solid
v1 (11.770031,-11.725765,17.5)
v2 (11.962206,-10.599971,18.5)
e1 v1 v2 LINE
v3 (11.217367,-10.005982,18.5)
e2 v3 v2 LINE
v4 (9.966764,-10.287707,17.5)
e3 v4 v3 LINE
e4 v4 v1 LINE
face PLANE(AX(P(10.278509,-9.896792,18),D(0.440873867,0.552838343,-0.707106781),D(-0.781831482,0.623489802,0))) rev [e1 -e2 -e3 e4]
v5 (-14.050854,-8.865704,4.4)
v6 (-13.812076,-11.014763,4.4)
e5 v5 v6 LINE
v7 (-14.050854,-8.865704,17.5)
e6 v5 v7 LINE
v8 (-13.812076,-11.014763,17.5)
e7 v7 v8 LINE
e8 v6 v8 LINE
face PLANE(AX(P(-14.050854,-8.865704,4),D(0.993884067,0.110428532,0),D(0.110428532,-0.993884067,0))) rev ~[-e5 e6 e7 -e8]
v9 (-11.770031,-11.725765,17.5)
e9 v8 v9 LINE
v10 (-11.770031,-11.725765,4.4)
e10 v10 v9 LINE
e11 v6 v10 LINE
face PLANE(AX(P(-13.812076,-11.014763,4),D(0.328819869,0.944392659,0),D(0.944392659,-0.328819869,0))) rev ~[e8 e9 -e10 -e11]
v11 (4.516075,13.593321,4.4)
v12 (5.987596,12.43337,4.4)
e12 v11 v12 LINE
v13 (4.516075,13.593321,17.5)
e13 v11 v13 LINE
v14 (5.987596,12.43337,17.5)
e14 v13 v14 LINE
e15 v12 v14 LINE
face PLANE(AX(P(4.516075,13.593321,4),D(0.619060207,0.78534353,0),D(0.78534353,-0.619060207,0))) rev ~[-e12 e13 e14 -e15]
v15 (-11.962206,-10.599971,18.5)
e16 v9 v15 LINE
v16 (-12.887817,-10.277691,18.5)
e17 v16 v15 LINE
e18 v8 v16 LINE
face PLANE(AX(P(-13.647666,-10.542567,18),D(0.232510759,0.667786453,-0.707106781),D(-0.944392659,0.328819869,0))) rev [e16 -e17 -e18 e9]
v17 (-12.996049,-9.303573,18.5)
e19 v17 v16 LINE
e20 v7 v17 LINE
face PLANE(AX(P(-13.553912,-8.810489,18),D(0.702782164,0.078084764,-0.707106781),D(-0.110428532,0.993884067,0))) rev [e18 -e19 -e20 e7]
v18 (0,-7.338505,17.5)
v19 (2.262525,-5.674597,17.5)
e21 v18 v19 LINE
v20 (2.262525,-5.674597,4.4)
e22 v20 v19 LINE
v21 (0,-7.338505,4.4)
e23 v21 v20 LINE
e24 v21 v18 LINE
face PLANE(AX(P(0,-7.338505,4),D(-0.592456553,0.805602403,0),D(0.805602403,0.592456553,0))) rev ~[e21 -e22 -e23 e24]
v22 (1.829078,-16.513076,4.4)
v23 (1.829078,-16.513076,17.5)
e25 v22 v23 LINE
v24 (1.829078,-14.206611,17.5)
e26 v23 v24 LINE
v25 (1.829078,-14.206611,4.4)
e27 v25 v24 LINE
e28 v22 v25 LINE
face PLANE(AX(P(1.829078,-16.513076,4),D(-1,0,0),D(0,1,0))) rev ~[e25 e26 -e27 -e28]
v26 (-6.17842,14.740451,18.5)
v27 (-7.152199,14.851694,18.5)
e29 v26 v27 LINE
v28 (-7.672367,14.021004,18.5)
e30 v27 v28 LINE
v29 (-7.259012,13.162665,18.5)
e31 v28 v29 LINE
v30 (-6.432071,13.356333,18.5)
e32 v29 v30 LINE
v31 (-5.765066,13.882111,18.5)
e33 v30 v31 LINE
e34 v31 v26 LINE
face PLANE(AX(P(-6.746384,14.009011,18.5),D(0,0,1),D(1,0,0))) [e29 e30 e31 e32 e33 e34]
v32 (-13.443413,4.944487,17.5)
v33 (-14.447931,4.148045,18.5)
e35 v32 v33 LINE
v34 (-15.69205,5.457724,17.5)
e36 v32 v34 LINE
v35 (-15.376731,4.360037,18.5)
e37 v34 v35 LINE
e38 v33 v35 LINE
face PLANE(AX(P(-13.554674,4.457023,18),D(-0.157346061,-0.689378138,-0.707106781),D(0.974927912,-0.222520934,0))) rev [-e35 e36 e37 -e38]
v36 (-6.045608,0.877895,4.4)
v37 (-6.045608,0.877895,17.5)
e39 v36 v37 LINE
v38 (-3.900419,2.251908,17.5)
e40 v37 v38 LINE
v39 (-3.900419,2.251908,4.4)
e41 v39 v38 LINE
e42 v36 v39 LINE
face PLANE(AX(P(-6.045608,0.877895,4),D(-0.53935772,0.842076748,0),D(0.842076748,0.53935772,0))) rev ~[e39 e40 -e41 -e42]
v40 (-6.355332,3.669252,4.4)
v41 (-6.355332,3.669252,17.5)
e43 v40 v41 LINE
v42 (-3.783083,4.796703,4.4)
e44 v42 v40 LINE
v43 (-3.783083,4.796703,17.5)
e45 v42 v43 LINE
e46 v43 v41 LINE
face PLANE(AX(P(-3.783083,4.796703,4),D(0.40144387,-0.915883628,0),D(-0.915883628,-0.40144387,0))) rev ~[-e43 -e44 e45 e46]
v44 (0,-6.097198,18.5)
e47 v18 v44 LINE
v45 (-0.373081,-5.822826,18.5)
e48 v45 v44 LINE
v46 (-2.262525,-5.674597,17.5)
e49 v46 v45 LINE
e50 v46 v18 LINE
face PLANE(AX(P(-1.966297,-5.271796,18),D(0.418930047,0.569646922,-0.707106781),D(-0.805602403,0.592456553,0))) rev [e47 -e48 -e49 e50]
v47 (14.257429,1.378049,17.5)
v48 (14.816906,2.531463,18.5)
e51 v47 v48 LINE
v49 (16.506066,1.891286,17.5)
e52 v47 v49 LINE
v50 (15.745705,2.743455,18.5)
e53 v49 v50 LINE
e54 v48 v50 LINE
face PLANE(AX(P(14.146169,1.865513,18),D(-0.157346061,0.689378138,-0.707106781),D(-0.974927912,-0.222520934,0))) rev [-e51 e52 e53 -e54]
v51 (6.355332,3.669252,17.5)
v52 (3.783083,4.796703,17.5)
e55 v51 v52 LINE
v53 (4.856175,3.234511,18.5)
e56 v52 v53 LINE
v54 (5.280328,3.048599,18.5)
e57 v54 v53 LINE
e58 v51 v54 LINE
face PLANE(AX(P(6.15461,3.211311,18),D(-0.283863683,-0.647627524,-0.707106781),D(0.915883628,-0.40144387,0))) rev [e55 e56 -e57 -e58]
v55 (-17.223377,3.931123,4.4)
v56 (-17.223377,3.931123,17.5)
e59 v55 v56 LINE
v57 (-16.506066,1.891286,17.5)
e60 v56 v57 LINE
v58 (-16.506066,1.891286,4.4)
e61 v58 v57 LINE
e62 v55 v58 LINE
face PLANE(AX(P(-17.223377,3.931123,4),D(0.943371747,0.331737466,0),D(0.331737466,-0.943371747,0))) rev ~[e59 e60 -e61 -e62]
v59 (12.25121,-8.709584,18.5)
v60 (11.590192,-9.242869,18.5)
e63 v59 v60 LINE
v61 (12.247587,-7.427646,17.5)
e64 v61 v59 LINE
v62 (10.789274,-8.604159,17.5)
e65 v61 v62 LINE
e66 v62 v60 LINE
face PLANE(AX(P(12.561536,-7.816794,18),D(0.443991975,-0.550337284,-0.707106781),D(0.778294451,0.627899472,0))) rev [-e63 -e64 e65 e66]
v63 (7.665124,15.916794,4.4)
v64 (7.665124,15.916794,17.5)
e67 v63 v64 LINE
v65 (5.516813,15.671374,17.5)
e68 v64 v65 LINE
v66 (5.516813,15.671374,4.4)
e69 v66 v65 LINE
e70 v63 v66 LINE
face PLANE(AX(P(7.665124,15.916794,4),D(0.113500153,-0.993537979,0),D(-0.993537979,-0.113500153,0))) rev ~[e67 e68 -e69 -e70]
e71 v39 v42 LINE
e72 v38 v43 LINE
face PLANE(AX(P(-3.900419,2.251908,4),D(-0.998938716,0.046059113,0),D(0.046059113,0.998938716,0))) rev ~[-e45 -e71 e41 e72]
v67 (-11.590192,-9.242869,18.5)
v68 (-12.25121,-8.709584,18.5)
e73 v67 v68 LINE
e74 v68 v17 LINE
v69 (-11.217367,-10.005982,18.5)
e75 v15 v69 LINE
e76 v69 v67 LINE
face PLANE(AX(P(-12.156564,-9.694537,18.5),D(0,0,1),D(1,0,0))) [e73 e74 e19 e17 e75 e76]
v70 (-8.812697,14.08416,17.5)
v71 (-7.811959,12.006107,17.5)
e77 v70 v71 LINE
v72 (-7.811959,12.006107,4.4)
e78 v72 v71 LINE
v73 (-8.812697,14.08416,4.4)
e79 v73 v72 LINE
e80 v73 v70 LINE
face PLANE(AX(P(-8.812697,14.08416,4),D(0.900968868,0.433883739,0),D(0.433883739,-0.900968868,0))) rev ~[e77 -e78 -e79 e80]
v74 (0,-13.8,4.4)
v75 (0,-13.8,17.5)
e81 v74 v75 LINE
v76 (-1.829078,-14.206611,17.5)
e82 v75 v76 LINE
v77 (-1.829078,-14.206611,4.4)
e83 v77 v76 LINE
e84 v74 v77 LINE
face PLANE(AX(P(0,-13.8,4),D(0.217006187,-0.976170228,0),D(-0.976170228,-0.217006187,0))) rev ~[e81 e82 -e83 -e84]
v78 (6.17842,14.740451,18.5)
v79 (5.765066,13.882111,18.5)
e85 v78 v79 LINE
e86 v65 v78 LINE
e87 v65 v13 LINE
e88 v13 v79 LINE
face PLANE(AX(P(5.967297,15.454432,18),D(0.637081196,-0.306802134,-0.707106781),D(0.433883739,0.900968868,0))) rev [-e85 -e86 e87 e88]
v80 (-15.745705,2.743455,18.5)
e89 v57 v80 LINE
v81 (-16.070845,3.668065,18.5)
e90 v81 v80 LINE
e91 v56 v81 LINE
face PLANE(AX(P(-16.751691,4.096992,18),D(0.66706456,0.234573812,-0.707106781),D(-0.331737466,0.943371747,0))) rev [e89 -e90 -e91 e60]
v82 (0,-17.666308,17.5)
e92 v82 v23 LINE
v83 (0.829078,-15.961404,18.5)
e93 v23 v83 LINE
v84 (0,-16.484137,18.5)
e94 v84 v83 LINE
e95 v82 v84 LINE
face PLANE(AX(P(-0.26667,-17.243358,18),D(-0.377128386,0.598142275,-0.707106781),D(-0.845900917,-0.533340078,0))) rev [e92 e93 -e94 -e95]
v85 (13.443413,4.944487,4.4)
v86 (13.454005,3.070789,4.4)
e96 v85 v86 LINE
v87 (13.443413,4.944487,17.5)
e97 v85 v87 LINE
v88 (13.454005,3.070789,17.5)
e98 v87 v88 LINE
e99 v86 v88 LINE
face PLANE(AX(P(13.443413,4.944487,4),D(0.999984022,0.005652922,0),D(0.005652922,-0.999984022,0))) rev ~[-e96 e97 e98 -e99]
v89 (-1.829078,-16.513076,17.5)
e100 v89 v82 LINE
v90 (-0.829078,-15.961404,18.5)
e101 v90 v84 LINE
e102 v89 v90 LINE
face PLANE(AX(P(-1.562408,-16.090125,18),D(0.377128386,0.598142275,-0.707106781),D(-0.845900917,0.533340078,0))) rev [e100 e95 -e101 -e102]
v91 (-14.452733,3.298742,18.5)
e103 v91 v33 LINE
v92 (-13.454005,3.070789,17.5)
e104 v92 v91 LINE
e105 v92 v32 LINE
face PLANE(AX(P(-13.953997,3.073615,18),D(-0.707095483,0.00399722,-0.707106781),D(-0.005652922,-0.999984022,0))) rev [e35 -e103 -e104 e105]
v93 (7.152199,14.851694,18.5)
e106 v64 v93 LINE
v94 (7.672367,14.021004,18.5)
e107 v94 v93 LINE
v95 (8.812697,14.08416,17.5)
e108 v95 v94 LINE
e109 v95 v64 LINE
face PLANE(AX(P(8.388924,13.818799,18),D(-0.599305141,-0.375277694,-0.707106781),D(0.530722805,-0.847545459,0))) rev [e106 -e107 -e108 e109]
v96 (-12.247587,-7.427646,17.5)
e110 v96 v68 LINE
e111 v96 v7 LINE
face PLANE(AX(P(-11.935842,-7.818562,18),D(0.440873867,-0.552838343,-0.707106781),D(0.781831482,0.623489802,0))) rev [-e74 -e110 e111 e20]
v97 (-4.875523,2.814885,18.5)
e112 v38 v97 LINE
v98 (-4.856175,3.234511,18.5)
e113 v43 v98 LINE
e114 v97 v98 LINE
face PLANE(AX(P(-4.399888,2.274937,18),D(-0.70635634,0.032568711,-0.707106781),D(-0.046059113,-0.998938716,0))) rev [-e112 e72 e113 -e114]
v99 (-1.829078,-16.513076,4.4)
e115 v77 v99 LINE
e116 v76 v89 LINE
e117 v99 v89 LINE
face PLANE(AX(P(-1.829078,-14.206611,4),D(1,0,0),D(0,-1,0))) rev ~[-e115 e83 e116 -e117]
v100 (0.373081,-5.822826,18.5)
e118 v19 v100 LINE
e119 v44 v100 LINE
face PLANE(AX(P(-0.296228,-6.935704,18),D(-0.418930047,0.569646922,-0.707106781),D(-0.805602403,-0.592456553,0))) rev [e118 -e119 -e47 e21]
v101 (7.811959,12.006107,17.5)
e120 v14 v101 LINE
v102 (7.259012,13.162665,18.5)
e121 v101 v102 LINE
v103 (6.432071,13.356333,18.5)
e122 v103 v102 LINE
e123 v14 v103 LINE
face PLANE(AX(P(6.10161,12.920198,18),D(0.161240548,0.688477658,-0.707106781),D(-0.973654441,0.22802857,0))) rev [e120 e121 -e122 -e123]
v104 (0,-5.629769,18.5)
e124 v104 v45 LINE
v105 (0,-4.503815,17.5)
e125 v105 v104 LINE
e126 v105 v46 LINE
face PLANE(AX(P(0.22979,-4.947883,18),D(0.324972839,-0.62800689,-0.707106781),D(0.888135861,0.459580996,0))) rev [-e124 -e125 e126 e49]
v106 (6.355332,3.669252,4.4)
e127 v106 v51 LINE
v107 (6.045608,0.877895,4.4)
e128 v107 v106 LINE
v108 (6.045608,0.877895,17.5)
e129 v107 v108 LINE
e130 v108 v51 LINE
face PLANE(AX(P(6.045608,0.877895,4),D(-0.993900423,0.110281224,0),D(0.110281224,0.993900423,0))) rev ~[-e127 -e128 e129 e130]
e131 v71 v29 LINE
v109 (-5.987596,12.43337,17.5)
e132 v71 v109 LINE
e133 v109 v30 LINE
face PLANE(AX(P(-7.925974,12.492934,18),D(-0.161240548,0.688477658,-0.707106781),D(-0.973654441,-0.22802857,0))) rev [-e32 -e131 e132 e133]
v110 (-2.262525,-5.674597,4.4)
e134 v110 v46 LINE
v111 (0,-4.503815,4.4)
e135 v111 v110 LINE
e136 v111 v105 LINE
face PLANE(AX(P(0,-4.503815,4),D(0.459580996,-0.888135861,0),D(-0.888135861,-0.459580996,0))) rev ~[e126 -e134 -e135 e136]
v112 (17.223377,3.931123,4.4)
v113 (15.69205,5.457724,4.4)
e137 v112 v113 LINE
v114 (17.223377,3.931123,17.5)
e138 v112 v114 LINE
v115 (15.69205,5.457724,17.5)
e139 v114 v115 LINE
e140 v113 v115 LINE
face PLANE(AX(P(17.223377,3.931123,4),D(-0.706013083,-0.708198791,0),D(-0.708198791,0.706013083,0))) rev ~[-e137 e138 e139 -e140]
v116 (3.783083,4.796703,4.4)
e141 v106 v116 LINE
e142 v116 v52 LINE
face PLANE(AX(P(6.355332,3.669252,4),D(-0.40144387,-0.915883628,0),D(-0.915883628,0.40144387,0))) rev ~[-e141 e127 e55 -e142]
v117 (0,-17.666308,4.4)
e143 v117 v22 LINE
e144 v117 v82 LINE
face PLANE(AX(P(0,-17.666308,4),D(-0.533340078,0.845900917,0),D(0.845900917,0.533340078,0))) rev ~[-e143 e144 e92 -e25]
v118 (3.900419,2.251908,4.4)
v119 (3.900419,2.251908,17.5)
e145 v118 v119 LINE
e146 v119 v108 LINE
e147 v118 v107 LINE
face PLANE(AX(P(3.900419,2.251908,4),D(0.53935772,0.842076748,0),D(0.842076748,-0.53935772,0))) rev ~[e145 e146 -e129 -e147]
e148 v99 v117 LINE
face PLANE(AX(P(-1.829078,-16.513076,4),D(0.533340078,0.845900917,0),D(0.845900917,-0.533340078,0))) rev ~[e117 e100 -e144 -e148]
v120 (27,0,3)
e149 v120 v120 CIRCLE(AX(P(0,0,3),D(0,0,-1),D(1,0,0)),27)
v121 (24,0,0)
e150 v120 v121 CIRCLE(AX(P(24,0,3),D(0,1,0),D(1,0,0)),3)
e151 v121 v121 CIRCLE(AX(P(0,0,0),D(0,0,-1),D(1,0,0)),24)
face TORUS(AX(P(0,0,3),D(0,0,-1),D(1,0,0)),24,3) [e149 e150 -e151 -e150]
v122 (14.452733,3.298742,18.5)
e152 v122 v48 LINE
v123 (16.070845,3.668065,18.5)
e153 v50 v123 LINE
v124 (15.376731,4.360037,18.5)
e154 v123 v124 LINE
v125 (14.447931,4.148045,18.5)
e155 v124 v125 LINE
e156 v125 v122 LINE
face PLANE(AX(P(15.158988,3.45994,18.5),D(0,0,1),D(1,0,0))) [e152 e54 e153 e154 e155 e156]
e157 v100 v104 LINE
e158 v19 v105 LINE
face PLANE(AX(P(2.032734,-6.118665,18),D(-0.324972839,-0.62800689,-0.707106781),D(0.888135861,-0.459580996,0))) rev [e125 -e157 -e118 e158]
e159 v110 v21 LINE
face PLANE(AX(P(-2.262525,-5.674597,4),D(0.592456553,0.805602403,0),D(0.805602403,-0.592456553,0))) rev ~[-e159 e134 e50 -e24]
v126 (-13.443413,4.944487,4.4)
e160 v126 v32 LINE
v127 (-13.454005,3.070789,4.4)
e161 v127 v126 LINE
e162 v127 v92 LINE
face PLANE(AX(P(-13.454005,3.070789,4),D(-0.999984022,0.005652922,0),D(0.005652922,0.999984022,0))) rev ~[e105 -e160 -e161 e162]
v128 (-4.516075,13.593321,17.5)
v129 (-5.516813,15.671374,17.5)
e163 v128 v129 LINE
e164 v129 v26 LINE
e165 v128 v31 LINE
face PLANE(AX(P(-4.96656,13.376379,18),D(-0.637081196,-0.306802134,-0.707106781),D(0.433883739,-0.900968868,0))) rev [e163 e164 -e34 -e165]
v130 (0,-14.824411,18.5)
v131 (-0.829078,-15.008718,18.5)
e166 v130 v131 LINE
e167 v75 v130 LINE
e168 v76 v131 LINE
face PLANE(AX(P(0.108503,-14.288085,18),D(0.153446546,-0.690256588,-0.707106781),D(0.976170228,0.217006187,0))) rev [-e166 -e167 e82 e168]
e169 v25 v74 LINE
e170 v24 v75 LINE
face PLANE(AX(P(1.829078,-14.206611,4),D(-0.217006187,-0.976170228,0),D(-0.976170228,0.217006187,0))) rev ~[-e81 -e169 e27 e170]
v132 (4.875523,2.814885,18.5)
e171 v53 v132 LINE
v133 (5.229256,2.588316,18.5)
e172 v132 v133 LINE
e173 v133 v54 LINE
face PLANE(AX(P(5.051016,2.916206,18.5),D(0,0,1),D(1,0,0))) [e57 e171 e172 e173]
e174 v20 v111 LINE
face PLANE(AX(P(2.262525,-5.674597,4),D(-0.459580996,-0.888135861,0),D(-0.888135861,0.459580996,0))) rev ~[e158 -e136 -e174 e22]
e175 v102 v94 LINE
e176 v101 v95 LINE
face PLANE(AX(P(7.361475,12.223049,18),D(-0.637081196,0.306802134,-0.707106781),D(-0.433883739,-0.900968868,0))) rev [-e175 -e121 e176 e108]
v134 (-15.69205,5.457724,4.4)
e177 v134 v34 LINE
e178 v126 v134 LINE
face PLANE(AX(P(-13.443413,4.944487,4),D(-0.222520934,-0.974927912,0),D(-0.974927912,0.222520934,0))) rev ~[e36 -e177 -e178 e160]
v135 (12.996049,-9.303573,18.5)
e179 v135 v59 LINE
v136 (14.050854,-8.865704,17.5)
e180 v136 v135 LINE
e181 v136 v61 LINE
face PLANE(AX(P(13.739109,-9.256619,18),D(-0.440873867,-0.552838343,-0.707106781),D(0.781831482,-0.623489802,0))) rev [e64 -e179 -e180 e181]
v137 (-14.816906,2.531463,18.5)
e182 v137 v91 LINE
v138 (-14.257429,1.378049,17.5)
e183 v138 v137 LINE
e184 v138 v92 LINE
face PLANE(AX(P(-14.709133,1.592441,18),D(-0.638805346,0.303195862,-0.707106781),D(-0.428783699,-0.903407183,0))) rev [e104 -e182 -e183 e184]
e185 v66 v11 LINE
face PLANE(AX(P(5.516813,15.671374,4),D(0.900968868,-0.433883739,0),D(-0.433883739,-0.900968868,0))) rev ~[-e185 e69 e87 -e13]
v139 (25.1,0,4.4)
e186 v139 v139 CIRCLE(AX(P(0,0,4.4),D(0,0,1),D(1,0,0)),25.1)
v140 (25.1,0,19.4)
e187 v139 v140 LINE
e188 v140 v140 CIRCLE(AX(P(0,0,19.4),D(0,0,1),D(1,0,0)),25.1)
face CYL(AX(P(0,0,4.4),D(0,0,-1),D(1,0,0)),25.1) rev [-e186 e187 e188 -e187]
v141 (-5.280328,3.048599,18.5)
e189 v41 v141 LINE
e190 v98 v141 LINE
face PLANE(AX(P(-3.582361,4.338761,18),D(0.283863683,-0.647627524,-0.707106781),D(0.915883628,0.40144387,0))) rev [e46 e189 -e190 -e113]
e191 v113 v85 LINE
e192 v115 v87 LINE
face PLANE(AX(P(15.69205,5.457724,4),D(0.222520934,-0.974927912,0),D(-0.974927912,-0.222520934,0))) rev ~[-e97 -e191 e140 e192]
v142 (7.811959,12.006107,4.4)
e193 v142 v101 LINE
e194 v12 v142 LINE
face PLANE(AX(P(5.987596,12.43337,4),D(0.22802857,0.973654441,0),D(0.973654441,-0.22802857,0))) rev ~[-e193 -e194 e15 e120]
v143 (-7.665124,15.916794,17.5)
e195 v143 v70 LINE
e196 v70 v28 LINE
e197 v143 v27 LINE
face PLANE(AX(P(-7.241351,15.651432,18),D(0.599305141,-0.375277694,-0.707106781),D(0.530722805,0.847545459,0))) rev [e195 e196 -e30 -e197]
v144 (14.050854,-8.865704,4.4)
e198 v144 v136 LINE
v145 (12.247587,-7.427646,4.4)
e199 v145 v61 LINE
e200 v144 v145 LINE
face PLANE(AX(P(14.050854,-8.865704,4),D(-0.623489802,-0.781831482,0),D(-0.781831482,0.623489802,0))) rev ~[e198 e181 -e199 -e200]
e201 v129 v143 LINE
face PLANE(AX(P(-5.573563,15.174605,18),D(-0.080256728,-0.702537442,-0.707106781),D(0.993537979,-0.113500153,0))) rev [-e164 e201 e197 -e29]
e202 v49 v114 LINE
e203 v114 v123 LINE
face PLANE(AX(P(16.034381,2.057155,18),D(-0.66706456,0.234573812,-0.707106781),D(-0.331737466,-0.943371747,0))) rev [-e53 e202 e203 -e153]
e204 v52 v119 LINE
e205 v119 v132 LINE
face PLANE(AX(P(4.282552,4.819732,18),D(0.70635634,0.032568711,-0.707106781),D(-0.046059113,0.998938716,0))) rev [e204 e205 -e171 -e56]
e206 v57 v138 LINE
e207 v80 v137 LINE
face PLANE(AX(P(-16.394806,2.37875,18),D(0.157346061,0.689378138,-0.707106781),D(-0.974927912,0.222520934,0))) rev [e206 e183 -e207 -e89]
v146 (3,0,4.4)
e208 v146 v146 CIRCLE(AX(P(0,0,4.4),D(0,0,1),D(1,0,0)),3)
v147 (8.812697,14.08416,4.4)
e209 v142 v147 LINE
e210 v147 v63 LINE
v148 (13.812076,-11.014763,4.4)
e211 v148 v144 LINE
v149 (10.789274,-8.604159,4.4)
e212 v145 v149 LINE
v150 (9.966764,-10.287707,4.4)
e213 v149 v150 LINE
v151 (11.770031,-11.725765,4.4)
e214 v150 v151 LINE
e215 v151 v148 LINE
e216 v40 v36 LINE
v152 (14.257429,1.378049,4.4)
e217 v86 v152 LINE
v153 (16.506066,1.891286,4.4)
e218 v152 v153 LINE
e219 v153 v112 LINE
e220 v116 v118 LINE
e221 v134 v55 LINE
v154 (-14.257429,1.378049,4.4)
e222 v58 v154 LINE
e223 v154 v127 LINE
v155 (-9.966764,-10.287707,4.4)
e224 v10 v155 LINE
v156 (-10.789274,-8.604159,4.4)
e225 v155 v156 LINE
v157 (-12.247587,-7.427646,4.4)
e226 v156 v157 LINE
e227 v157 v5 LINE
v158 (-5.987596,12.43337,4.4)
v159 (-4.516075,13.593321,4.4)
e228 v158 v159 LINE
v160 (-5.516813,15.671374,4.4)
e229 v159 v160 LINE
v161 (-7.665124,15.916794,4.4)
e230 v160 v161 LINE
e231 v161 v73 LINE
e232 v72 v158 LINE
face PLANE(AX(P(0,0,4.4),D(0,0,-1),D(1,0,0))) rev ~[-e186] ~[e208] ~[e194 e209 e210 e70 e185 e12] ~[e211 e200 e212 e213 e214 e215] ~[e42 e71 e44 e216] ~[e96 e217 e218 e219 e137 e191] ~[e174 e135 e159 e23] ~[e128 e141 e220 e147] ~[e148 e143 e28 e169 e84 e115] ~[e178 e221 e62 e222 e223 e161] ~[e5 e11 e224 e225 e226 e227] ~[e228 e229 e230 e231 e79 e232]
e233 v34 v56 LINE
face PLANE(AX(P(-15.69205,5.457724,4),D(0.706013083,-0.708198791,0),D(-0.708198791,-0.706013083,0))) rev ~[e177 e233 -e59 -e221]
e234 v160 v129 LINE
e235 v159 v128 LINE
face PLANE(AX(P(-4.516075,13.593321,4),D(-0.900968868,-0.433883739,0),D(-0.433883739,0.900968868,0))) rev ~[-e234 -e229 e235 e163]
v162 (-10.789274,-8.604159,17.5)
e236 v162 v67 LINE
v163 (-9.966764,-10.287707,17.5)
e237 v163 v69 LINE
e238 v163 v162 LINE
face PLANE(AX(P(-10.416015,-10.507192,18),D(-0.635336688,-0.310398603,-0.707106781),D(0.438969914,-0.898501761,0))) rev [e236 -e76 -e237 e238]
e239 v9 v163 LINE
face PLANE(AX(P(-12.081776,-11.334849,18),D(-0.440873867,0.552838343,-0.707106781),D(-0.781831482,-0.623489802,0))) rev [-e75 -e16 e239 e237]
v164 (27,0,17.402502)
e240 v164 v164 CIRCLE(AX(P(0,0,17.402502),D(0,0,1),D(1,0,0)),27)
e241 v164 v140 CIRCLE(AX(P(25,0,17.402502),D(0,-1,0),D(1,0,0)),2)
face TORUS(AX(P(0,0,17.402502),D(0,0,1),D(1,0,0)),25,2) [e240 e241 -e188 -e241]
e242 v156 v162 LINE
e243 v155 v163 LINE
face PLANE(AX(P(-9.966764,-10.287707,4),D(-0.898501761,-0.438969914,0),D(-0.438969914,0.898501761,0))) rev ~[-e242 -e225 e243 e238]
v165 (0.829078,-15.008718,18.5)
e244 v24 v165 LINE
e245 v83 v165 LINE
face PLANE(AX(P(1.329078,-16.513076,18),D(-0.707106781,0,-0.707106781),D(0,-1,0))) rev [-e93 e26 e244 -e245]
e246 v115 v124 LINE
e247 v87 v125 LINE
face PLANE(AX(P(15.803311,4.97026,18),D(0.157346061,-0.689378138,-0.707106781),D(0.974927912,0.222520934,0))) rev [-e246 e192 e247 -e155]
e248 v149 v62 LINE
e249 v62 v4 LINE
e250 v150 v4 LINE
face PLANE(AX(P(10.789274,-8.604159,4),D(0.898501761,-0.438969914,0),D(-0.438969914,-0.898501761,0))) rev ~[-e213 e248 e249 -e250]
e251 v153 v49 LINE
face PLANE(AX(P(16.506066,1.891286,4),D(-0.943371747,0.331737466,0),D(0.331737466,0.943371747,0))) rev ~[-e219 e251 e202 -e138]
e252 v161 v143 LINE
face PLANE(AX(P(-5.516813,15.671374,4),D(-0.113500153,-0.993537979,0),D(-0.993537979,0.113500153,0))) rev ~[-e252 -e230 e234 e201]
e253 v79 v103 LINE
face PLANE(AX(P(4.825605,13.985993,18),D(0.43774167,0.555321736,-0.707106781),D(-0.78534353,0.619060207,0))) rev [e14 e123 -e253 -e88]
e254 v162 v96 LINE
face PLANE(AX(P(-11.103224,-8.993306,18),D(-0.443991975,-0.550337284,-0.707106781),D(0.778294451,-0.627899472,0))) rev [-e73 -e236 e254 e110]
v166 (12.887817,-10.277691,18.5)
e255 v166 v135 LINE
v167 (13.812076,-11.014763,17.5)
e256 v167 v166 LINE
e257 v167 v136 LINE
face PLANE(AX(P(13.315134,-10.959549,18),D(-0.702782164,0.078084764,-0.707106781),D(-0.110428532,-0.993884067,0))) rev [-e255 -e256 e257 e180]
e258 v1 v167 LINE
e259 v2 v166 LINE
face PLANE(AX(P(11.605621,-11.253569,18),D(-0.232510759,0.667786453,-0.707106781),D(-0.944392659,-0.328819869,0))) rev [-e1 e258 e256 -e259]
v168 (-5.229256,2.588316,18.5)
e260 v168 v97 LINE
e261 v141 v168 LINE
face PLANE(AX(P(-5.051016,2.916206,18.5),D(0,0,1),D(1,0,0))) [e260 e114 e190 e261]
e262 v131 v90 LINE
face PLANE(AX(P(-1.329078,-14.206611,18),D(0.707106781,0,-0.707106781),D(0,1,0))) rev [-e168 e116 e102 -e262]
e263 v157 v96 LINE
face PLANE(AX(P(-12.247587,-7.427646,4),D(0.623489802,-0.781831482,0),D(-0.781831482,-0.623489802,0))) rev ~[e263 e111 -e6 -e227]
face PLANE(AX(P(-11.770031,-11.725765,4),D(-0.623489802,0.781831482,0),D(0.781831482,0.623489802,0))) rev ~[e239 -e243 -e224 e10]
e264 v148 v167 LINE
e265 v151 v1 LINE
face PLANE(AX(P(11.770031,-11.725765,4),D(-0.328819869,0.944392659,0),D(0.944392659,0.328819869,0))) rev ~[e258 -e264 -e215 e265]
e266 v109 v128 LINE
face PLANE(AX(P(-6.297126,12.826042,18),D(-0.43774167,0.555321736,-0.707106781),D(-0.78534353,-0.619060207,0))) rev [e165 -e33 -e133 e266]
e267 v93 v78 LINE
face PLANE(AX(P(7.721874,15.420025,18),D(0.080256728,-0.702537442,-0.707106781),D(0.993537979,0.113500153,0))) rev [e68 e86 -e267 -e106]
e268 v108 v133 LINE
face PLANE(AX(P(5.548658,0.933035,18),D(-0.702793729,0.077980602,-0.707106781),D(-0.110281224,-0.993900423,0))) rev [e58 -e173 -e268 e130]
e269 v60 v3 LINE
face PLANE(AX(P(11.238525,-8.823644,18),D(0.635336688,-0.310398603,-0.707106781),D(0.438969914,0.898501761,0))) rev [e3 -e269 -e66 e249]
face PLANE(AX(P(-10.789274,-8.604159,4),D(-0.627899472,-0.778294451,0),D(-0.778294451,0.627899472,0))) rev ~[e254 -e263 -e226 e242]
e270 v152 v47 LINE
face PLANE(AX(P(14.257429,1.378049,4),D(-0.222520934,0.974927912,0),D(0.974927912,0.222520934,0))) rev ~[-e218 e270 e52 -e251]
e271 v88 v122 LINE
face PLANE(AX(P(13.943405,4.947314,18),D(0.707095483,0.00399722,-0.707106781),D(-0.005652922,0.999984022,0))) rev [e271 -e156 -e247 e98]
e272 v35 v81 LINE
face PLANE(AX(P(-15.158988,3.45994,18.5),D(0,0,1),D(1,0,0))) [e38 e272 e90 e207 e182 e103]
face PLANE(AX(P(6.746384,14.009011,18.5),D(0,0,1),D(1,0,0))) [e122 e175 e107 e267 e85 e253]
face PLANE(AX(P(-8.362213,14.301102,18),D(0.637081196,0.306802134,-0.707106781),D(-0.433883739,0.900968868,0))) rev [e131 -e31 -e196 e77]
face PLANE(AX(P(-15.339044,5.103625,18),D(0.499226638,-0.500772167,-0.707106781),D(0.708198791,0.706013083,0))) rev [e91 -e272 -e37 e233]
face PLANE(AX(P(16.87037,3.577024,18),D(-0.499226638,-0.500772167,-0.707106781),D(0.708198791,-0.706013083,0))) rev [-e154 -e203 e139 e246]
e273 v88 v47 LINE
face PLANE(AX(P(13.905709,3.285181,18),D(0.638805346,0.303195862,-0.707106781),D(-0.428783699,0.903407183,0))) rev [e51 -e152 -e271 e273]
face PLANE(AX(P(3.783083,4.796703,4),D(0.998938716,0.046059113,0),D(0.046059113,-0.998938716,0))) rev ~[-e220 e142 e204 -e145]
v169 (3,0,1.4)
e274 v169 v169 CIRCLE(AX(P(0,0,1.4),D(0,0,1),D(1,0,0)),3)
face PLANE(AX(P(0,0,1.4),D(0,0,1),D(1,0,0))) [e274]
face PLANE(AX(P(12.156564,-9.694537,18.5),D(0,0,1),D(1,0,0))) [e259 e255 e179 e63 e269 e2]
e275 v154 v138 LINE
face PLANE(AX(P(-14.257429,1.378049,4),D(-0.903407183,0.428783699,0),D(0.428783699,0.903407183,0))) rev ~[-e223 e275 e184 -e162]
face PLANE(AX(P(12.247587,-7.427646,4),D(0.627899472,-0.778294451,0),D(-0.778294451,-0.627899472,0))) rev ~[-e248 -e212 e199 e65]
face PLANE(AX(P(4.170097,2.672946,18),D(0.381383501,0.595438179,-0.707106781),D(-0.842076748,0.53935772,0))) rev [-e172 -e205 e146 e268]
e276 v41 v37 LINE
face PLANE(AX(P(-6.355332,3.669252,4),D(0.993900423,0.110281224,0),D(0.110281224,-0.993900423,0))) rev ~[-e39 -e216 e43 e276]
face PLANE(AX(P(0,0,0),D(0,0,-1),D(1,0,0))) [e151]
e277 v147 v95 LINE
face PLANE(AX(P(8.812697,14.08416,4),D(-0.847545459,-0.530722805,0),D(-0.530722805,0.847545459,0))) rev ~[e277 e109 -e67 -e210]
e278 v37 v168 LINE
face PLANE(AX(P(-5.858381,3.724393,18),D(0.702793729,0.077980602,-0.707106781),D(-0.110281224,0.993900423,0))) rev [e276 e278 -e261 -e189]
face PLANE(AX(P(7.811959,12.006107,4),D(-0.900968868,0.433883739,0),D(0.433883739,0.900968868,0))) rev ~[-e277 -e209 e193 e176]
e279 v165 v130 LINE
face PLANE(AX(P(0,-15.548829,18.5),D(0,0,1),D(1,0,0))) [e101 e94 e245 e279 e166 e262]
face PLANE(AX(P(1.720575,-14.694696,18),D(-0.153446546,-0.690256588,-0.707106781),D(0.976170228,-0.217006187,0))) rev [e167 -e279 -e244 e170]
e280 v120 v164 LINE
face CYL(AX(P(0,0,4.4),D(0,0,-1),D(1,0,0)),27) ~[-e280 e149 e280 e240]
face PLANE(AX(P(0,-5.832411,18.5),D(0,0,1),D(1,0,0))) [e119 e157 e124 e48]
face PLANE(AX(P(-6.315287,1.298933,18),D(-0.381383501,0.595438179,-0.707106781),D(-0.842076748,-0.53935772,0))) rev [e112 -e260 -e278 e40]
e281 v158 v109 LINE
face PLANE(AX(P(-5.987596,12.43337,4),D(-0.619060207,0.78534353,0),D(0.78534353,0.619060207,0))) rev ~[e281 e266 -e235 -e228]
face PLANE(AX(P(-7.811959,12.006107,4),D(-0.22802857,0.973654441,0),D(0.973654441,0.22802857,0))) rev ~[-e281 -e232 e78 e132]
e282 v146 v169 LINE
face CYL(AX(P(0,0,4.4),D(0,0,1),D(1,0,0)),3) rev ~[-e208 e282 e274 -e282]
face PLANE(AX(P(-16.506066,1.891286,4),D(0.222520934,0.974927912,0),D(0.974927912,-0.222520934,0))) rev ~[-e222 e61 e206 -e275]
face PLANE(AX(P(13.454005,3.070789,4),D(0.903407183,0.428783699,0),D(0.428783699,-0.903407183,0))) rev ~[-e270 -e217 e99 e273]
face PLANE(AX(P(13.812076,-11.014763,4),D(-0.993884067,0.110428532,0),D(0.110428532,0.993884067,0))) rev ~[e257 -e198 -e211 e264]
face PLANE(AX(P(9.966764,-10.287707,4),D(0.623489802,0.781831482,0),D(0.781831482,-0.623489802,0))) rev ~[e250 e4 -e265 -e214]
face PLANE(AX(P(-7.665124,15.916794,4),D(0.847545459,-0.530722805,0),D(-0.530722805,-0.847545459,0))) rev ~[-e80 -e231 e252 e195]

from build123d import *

# Parameters (mm, degrees)
F0_R      = 25
F1_DEPTH  = 4
F3_R      = 27
F4_DEPTH  = 4.4
F5_DEPTH  = 14.5
F6_R      = 27
F6_R_2    = 25.1
F7_DEPTH  = 15
F9_R      = 3
F10_SIZE  = 1
F11_R     = 3
F12_DEPTH = 3


# Not quite as in the source:
# - a fillet or chamfer that OpenCascade refuses, or shapes differently, is made with other operations: its cross-section is extruded or revolved along the edge and cut away or added
# - a feature names something its author has since deleted; it is built from what else it names


with BuildPart() as f1:
    # F0 (on Top) → F1 (new body)
    with BuildSketch(Plane.XY):
        Circle(F0_R)
    extrude(amount=F1_DEPTH)

    # F3 (on face) → F4 (join)
    with BuildSketch(Plane(origin=(0, 0, 0), x_dir=(1, 0, 0), z_dir=(0, 0, -1))):
        Circle(F3_R)
    extrude(amount=-F4_DEPTH)

    # F2 (on face) → F5 (join)
    with BuildSketch(Plane.XY.offset(4)):
        Polygon((1.8290777225, -14.20661062), (0, -13.8), (-1.8290777225, -14.20661062), (-1.8290777225, -16.5130756795), (0, -17.6663082093), (1.8290777225, -16.5130756795), align=None)
        Polygon((10.7892744581, -8.6041592657), (9.9667641351, -10.2877073879), (11.7700311319, -11.7257648309), (13.812075937, -11.014763005), (14.0508537454, -8.8657037362), (12.2475867487, -7.4276462932), align=None)
        Polygon((13.4540051881, 3.0707888886), (14.257429314, 1.3780493383), (16.506066479, 1.8912860975), (17.2233769785, 3.9311234023), (15.6920503129, 5.4577239479), (13.4434131479, 4.9444871887), align=None)
        Polygon((5.9875955998, 12.4333703771), (7.811959421, 12.0061068057), (8.8126971051, 14.0841600192), (7.6651238623, 15.9167937073), (5.5168129352, 15.671374182), (4.5160752511, 13.5933209684), align=None)
        Polygon((-5.9875955998, 12.4333703771), (-4.5160752511, 13.5933209684), (-5.5168129352, 15.671374182), (-7.6651238623, 15.9167937073), (-8.8126971051, 14.0841600192), (-7.811959421, 12.0061068057), align=None)
        Polygon((-13.4540051881, 3.0707888886), (-13.4434131479, 4.9444871887), (-15.6920503129, 5.4577239479), (-17.2233769785, 3.9311234023), (-16.506066479, 1.8912860975), (-14.257429314, 1.3780493383), align=None)
        Polygon((-10.7892744581, -8.6041592657), (-12.2475867487, -7.4276462932), (-14.0508537454, -8.8657037362), (-13.812075937, -11.014763005), (-11.7700311319, -11.7257648309), (-9.9667641351, -10.2877073879), align=None)
        Polygon((2.2625249746, -5.6745974369), (0, -4.5038154349), (-2.2625249746, -5.6745974369), (0, -7.3385047726), align=None)
        Polygon((3.7830830493, 4.7967028232), (3.9004185806, 2.2519077174), (6.0456080239, 0.8778946137), (6.3553315589, 3.6692523863), align=None)
        Polygon((-6.0456080239, 0.8778946137), (-3.9004185806, 2.2519077174), (-3.7830830493, 4.7967028232), (-6.3553315589, 3.6692523863), align=None)
    extrude(amount=F5_DEPTH)

    # F6 (on face) → F7 (join)
    with BuildSketch(Plane.XY.offset(4.4)):
        Circle(F6_R)
        Circle(F6_R_2, mode=Mode.SUBTRACT)
    extrude(amount=F7_DEPTH)

    # F8: fillet of radius 2 on 1 edges, made by hand

    # F8_s1 → F8_t2 (revolve, cut)
    with BuildSketch(Plane.XZ):
        with BuildLine():
            ThreePointArc((27, 17.4025015645), (26.4491376746, 18.7809064397), (25.1, 19.4))
            Line((25.1, 19.4), (27, 19.4))
            Line((27, 19.4), (27, 17.4025015645))
        make_face()
    revolve(axis=Axis((0, 0, 19.4), (0, 0, 1)), mode=Mode.SUBTRACT)

    # F9
    f9_edges = [f1.edges().sort_by_distance(p)[0] for p in [
        (-27, 0, 0),
    ]]
    fillet(f9_edges, radius=F9_R)

    # F10
    f10_edges = [f1.edges().sort_by_distance(p)[0] for p in [
        (1.131262, -5.089206, 18.5),
        (-1.131262, -5.089206, 18.5),
        (-1.131262, -6.506551, 18.5),
        (1.131262, -6.506551, 18.5),
        (6.20047, 2.273574, 18.5),
        (5.069207, 4.232978, 18.5),
        (3.841751, 3.524305, 18.5),
        (4.973013, 1.564901, 18.5),
        (5.016444, 14.632348, 18.5),
        (5.251835, 13.013346, 18.5),
        (6.899778, 12.219739, 18.5),
        (8.312328, 13.045133, 18.5),
        (8.23891, 15.000477, 18.5),
        (6.590968, 15.794084, 18.5),
        (-5.069207, 4.232978, 18.5),
        (-6.20047, 2.273574, 18.5),
        (-4.973013, 1.564901, 18.5),
        (-3.841751, 3.524305, 18.5),
        (-5.251835, 13.013346, 18.5),
        (-5.016444, 14.632348, 18.5),
        (-6.590968, 15.794084, 18.5),
        (-8.23891, 15.000477, 18.5),
        (-8.312328, 13.045133, 18.5),
        (-6.899778, 12.219739, 18.5),
        (13.855717, 2.224419, 18.5),
        (15.381748, 1.634668, 18.5),
        (16.864722, 2.911205, 18.5),
        (16.457714, 4.694424, 18.5),
        (14.567732, 5.201106, 18.5),
        (13.448709, 4.007638, 18.5),
        (10.378019, -9.445933, 18.5),
        (10.868398, -11.006736, 18.5),
        (12.791054, -11.370264, 18.5),
        (13.931465, -9.940233, 18.5),
        (13.14922, -8.146675, 18.5),
        (11.518431, -8.015903, 18.5),
        (0.914539, -14.003305, 18.5),
        (-0.914539, -14.003305, 18.5),
        (-1.829078, -15.359843, 18.5),
        (-0.914539, -17.089692, 18.5),
        (0.914539, -17.089692, 18.5),
        (1.829078, -15.359843, 18.5),
        (-11.518431, -8.015903, 18.5),
        (-13.14922, -8.146675, 18.5),
        (-13.931465, -9.940233, 18.5),
        (-12.791054, -11.370264, 18.5),
        (-10.868398, -11.006736, 18.5),
        (-10.378019, -9.445933, 18.5),
        (-15.381748, 1.634668, 18.5),
        (-13.855717, 2.224419, 18.5),
        (-13.448709, 4.007638, 18.5),
        (-14.567732, 5.201106, 18.5),
        (-16.457714, 4.694424, 18.5),
        (-16.864722, 2.911205, 18.5),
    ]]
    chamfer(f10_edges, length=F10_SIZE)

    # F11 (on face) → F12 (cut)
    with BuildSketch(Plane.XY.offset(4.4)):
        Circle(F11_R)
    extrude(amount=-F12_DEPTH, mode=Mode.SUBTRACT)


solid = f1.part
